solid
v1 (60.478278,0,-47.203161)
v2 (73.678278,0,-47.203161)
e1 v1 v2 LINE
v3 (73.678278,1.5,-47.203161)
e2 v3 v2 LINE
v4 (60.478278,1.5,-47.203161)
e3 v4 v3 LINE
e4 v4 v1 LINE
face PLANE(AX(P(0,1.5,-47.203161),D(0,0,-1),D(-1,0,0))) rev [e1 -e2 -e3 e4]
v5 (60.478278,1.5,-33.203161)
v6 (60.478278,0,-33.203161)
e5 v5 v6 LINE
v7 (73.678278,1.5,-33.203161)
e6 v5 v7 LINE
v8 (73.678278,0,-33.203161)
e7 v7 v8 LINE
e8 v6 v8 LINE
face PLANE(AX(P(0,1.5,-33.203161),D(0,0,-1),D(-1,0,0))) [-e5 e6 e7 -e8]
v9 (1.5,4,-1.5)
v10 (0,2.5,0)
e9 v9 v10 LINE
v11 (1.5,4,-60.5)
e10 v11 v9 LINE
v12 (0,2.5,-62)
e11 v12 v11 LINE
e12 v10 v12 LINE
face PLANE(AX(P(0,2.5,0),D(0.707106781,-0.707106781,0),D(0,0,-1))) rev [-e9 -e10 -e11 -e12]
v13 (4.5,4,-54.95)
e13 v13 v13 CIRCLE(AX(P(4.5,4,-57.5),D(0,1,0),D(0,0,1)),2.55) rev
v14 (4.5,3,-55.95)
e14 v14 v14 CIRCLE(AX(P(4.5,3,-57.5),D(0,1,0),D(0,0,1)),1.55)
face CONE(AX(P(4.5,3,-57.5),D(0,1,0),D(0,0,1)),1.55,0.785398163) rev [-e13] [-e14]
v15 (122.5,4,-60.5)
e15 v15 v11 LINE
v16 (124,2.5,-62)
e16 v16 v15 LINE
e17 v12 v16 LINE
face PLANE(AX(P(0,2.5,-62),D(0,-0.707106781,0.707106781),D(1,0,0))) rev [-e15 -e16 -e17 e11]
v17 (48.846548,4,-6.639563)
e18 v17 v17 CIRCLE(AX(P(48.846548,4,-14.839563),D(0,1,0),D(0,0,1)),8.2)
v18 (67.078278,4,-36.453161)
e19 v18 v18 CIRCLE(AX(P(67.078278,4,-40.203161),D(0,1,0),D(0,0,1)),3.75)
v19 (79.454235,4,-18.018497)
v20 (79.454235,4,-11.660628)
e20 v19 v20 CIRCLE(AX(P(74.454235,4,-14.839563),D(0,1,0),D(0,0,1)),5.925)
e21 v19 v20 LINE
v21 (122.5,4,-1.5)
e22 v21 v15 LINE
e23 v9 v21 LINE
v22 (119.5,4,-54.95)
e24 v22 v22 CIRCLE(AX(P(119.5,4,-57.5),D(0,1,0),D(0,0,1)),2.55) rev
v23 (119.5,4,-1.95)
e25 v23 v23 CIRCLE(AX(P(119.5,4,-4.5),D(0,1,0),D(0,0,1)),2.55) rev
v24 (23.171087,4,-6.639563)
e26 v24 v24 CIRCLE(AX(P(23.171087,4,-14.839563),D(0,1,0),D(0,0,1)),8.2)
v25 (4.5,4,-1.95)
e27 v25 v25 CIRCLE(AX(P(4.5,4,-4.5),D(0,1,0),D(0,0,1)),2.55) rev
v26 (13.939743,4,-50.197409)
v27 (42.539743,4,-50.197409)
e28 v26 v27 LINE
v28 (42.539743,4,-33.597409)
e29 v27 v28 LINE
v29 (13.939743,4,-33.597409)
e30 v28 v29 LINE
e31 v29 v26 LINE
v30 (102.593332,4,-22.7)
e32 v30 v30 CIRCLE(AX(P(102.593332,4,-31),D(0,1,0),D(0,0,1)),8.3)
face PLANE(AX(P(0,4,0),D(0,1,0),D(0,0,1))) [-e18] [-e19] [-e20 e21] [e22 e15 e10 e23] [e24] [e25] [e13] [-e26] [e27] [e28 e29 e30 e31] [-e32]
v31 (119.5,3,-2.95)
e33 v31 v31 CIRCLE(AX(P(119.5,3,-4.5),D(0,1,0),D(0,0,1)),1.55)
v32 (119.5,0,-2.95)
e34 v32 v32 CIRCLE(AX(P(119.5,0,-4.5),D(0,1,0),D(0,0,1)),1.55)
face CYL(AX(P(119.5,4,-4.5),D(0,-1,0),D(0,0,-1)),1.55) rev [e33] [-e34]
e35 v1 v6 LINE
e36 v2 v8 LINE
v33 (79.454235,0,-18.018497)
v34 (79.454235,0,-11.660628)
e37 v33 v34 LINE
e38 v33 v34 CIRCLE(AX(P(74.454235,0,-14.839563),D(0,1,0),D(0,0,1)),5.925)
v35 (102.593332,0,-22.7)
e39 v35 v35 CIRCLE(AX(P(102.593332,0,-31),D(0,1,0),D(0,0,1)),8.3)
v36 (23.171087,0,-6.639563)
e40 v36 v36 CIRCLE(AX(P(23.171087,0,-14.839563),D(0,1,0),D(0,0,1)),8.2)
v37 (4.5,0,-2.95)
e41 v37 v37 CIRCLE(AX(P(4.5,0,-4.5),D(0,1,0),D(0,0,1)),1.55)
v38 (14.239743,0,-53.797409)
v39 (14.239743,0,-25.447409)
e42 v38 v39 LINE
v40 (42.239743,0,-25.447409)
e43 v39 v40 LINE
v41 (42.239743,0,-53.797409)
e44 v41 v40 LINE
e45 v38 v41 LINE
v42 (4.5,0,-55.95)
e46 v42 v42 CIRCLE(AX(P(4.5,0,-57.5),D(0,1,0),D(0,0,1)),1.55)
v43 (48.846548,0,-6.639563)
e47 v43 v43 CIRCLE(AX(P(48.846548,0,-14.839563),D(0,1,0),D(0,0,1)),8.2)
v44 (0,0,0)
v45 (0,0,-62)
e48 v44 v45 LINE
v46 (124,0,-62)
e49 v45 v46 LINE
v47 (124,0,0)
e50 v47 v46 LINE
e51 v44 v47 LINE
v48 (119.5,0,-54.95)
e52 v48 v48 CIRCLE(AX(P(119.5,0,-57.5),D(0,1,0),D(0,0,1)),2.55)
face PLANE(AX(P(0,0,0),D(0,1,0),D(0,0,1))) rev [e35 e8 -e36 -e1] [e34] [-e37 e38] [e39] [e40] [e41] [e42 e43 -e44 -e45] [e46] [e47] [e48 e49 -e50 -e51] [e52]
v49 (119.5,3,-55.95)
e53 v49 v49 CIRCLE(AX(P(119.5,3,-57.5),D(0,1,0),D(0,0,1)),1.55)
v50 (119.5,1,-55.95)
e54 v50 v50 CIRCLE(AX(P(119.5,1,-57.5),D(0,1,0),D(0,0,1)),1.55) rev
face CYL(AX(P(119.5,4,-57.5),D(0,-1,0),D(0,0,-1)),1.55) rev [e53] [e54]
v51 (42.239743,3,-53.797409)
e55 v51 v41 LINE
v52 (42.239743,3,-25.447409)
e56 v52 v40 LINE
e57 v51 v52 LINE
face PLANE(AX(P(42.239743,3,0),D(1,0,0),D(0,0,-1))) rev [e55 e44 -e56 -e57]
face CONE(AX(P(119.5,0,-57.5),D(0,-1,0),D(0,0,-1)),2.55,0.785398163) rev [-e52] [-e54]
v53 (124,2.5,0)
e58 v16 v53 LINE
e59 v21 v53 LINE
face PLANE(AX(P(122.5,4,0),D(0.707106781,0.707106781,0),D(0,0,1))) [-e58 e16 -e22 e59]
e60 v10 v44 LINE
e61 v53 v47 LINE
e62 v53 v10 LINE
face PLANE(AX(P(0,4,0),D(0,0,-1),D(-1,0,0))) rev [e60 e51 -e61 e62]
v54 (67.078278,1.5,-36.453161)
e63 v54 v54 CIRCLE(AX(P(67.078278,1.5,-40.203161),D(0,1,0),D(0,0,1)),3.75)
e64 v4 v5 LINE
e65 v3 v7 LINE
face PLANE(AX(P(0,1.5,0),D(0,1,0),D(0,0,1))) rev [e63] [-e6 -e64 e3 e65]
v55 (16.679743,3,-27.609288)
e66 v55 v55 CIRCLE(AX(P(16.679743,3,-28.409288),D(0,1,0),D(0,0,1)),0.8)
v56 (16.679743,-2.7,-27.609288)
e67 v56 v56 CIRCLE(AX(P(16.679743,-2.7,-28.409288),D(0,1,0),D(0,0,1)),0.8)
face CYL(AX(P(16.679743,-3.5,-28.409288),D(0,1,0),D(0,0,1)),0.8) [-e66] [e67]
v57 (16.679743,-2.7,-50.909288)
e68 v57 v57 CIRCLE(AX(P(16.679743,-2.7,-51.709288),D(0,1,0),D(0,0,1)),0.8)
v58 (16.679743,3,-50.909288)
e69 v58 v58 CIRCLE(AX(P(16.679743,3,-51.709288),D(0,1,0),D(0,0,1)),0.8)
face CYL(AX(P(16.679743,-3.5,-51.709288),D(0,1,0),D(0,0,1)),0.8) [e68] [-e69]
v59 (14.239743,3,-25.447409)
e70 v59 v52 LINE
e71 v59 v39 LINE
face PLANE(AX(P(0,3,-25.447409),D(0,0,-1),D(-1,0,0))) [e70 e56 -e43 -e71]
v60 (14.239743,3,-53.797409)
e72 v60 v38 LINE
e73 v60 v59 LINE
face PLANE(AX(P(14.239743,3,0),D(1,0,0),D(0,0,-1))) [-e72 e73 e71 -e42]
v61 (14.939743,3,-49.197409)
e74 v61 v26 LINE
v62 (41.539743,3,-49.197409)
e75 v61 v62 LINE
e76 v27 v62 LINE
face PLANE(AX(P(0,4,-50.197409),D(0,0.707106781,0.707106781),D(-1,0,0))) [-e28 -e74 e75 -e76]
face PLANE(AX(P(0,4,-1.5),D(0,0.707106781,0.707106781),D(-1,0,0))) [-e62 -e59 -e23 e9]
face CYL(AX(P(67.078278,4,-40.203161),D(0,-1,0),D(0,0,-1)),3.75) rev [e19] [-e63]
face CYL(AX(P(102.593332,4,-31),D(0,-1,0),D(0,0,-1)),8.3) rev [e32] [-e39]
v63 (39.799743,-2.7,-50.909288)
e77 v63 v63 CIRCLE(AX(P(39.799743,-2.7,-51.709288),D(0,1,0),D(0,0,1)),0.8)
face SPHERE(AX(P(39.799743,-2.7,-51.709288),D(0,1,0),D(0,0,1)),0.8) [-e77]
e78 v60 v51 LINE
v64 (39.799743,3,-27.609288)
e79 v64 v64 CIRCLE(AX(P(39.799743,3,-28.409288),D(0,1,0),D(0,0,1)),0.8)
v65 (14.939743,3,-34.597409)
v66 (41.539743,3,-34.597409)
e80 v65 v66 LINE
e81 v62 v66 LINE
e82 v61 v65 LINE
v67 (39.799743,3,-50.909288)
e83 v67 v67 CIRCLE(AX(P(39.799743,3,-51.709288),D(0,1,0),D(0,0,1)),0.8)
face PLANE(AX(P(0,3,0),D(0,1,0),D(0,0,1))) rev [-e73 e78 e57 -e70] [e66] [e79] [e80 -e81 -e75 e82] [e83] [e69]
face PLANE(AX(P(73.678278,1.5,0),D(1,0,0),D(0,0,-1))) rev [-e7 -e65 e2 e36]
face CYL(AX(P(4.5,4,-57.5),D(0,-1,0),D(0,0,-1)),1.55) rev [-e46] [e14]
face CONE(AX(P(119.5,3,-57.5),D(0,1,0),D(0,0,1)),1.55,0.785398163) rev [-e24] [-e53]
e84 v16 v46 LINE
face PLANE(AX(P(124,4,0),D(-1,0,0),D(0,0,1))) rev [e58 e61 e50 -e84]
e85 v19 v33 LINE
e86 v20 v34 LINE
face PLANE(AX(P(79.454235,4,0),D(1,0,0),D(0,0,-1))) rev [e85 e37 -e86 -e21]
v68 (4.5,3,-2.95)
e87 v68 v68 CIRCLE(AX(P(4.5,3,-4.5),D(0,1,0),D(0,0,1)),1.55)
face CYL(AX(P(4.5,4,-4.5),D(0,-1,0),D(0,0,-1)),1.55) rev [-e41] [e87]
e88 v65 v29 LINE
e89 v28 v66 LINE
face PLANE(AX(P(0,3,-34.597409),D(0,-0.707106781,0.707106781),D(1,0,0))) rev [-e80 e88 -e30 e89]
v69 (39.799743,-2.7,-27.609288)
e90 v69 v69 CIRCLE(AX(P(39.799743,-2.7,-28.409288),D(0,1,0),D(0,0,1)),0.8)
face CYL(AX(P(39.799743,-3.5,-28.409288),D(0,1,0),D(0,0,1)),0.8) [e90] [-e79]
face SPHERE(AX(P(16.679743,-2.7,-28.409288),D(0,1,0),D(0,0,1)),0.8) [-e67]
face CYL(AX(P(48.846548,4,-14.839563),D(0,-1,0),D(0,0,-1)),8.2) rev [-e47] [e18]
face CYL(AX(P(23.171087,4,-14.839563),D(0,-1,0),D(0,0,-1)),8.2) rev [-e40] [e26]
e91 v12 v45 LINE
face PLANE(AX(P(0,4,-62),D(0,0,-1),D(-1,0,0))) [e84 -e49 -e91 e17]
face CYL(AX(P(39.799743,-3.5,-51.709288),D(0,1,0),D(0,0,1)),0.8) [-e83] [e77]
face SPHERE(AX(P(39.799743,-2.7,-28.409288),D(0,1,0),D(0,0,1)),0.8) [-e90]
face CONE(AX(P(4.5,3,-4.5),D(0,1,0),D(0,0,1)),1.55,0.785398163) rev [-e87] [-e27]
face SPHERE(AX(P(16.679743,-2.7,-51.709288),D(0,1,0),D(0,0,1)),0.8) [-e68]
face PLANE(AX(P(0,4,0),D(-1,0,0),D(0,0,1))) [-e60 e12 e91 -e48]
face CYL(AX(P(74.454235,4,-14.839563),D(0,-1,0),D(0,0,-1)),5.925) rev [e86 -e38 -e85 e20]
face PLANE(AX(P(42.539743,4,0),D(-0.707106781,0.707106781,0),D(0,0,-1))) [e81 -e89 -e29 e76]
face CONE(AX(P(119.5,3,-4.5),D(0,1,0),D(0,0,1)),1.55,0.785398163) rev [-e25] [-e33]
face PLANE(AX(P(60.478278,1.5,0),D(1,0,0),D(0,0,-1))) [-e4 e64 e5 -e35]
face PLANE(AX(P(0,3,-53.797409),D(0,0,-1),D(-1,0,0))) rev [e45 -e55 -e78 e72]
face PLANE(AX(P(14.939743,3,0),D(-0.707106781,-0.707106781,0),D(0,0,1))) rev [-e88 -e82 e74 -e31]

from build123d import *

# Parameters (mm, degrees)
SKETCH2_W           = 124
SKETCH2_H           = 62
SKETCH2_R           = 1.55
SKETCH2_W_2         = 26.6
SKETCH2_H_2         = 14.6
SKETCH2_R_2         = 3.75
SKETCH2_R_3         = 8.3
SKETCH2_R_4         = 8.2
BOSS_EXTRUDE1_DEPTH = 4
CHAMFER1_SIZE       = 1.5
CHAMFER2_SIZE       = 1
SKETCH2_3_R         = 0.8
BOSS_EXTRUDE2_DEPTH = 3.5
FILLET1_R           = 0.8
CUT_EXTRUDE1_START  = 3
SKETCH2_4_W         = 28
SKETCH2_4_H         = 28.35
SKETCH2_4_R         = 0.8
SKETCH2_4_W_2       = 26.6
SKETCH2_4_H_2       = 14.6
CUT_EXTRUDE1_DEPTH  = 3
CHAMFER3_SIZE       = 1
SKETCH2_5_W         = 13.2
SKETCH2_5_H         = 14
CUT_EXTRUDE4_DEPTH  = 1.5


with BuildPart() as part:
    # Sketch2 → Boss-Extrude1 (new body)
    with BuildSketch(Plane(origin=(0, 0, 0), x_dir=(1, 0, 0), z_dir=(0, 1, 0))):
        with Locations((62, 31)):
            Rectangle(SKETCH2_W, SKETCH2_H)
        with Locations(Location((4.5, 4.5, 0), (0, 0, 270))):
            Circle(SKETCH2_R, mode=Mode.SUBTRACT)
        with Locations(Location((119.5, 4.5, 0), (0, 0, 270))):
            Circle(SKETCH2_R, mode=Mode.SUBTRACT)
        with Locations((28.239743387, 41.89740921)):
            Rectangle(SKETCH2_W_2, SKETCH2_H_2, mode=Mode.SUBTRACT)
        with Locations(Location((4.5, 57.5, 0), (0, 0, 270))):
            Circle(SKETCH2_R, mode=Mode.SUBTRACT)
        with Locations(Location((67.078277823, 40.203161161, 0), (0, 0, 270))):
            Circle(SKETCH2_R_2, mode=Mode.SUBTRACT)
        with Locations(Location((119.5, 57.5, 0), (0, 0, 270))):
            Circle(SKETCH2_R, mode=Mode.SUBTRACT)
        with Locations(Location((102.593331931, 31, 0), (0, 0, 270))):
            Circle(SKETCH2_R_3, mode=Mode.SUBTRACT)
        with BuildLine():
            ThreePointArc((79.454234541, 11.660627935), (68.529234541, 14.839562505), (79.454234541, 18.018497075))
            Line((79.454234541, 18.018497075), (79.454234541, 11.660627935))
        make_face(mode=Mode.SUBTRACT)
        with Locations(Location((48.846547615, 14.839562505, 0), (0, 0, 270))):
            Circle(SKETCH2_R_4, mode=Mode.SUBTRACT)
        with Locations(Location((23.171087178, 14.839562505, 0), (0, 0, 270))):
            Circle(SKETCH2_R_4, mode=Mode.SUBTRACT)
    extrude(amount=BOSS_EXTRUDE1_DEPTH)

    # Chamfer1
    chamfer1_edges = [part.edges().sort_by_distance(p)[0] for p in [
        (62, 4, 0),
        (124, 4, -31),
        (62, 4, -62),
        (0, 4, -31),
    ]]
    chamfer(chamfer1_edges, length=CHAMFER1_SIZE)

    # Chamfer2
    chamfer2_edges = [part.edges().sort_by_distance(p)[0] for p in [
        (119.5, 0, -59.05),
        (4.5, 4, -6.05),
        (119.5, 4, -59.05),
        (119.5, 4, -6.05),
        (4.5, 4, -59.05),
    ]]
    chamfer(chamfer2_edges, length=CHAMFER2_SIZE)

    # Sketch2<3> → Boss-Extrude2 (add)
    with BuildSketch(Plane(origin=(0, 0, 0), x_dir=(1, 0, 0), z_dir=(0, 1, 0))):
        with Locations(Location((16.679743387, 28.409287577, 0), (0, 0, 270))):
            Circle(SKETCH2_3_R)
        with Locations(Location((16.679743387, 51.709287577, 0), (0, 0, 270))):
            Circle(SKETCH2_3_R)
        with Locations(Location((39.799743387, 28.409287577, 0), (0, 0, 270))):
            Circle(SKETCH2_3_R)
        with Locations(Location((39.799743387, 51.709287577, 0), (0, 0, 270))):
            Circle(SKETCH2_3_R)
    extrude(amount=-BOSS_EXTRUDE2_DEPTH)

    # Fillet1
    fillet1_edges = [part.edges().sort_by_distance(p)[0] for p in [
        (39.799743387, -3.5, -29.209287577),
        (39.799743387, -3.5, -52.509287577),
        (16.679743387, -3.5, -29.209287577),
        (16.679743387, -3.5, -52.509287577),
    ]]
    fillet(fillet1_edges, radius=FILLET1_R)

    # Sketch2<4> → Cut-Extrude1 (cut)
    with BuildSketch(Plane(origin=(0, 0, 0), x_dir=(1, 0, 0), z_dir=(0, 1, 0)).offset(CUT_EXTRUDE1_START)):
        with Locations((28.239743387, 39.62240921)):
            Rectangle(SKETCH2_4_W, SKETCH2_4_H)
        with Locations(Location((16.679743387, 51.709287577, 0), (0, 0, 270))):
            Circle(SKETCH2_4_R, mode=Mode.SUBTRACT)
        with Locations(Location((16.679743387, 28.409287577, 0), (0, 0, 270))):
            Circle(SKETCH2_4_R, mode=Mode.SUBTRACT)
        with Locations(Location((39.799743387, 28.409287577, 0), (0, 0, 270))):
            Circle(SKETCH2_4_R, mode=Mode.SUBTRACT)
        with Locations(Location((39.799743387, 51.709287577, 0), (0, 0, 270))):
            Circle(SKETCH2_4_R, mode=Mode.SUBTRACT)
        with Locations((28.239743387, 41.89740921)):
            Rectangle(SKETCH2_4_W_2, SKETCH2_4_H_2, mode=Mode.SUBTRACT)
    extrude(amount=-CUT_EXTRUDE1_DEPTH, mode=Mode.SUBTRACT)

    # Chamfer3
    chamfer3_edges = [part.edges().sort_by_distance(p)[0] for p in [
        (28.239743387, 4, -34.59740921),
        (41.539743387, 4, -41.89740921),
        (14.939743387, 4, -41.89740921),
        (28.239743387, 4, -49.19740921),
    ]]
    chamfer(chamfer3_edges, length=CHAMFER3_SIZE - 0.0001)  # a hair under: the kernel refuses the full size

    # Sketch2<5> → Cut-Extrude4 (cut)
    with BuildSketch(Plane(origin=(0, 0, 0), x_dir=(1, 0, 0), z_dir=(0, 1, 0))):
        with Locations((67.078277823, 40.203161161)):
            Rectangle(SKETCH2_5_W, SKETCH2_5_H)
    extrude(amount=CUT_EXTRUDE4_DEPTH, mode=Mode.SUBTRACT)


solid = part.part
